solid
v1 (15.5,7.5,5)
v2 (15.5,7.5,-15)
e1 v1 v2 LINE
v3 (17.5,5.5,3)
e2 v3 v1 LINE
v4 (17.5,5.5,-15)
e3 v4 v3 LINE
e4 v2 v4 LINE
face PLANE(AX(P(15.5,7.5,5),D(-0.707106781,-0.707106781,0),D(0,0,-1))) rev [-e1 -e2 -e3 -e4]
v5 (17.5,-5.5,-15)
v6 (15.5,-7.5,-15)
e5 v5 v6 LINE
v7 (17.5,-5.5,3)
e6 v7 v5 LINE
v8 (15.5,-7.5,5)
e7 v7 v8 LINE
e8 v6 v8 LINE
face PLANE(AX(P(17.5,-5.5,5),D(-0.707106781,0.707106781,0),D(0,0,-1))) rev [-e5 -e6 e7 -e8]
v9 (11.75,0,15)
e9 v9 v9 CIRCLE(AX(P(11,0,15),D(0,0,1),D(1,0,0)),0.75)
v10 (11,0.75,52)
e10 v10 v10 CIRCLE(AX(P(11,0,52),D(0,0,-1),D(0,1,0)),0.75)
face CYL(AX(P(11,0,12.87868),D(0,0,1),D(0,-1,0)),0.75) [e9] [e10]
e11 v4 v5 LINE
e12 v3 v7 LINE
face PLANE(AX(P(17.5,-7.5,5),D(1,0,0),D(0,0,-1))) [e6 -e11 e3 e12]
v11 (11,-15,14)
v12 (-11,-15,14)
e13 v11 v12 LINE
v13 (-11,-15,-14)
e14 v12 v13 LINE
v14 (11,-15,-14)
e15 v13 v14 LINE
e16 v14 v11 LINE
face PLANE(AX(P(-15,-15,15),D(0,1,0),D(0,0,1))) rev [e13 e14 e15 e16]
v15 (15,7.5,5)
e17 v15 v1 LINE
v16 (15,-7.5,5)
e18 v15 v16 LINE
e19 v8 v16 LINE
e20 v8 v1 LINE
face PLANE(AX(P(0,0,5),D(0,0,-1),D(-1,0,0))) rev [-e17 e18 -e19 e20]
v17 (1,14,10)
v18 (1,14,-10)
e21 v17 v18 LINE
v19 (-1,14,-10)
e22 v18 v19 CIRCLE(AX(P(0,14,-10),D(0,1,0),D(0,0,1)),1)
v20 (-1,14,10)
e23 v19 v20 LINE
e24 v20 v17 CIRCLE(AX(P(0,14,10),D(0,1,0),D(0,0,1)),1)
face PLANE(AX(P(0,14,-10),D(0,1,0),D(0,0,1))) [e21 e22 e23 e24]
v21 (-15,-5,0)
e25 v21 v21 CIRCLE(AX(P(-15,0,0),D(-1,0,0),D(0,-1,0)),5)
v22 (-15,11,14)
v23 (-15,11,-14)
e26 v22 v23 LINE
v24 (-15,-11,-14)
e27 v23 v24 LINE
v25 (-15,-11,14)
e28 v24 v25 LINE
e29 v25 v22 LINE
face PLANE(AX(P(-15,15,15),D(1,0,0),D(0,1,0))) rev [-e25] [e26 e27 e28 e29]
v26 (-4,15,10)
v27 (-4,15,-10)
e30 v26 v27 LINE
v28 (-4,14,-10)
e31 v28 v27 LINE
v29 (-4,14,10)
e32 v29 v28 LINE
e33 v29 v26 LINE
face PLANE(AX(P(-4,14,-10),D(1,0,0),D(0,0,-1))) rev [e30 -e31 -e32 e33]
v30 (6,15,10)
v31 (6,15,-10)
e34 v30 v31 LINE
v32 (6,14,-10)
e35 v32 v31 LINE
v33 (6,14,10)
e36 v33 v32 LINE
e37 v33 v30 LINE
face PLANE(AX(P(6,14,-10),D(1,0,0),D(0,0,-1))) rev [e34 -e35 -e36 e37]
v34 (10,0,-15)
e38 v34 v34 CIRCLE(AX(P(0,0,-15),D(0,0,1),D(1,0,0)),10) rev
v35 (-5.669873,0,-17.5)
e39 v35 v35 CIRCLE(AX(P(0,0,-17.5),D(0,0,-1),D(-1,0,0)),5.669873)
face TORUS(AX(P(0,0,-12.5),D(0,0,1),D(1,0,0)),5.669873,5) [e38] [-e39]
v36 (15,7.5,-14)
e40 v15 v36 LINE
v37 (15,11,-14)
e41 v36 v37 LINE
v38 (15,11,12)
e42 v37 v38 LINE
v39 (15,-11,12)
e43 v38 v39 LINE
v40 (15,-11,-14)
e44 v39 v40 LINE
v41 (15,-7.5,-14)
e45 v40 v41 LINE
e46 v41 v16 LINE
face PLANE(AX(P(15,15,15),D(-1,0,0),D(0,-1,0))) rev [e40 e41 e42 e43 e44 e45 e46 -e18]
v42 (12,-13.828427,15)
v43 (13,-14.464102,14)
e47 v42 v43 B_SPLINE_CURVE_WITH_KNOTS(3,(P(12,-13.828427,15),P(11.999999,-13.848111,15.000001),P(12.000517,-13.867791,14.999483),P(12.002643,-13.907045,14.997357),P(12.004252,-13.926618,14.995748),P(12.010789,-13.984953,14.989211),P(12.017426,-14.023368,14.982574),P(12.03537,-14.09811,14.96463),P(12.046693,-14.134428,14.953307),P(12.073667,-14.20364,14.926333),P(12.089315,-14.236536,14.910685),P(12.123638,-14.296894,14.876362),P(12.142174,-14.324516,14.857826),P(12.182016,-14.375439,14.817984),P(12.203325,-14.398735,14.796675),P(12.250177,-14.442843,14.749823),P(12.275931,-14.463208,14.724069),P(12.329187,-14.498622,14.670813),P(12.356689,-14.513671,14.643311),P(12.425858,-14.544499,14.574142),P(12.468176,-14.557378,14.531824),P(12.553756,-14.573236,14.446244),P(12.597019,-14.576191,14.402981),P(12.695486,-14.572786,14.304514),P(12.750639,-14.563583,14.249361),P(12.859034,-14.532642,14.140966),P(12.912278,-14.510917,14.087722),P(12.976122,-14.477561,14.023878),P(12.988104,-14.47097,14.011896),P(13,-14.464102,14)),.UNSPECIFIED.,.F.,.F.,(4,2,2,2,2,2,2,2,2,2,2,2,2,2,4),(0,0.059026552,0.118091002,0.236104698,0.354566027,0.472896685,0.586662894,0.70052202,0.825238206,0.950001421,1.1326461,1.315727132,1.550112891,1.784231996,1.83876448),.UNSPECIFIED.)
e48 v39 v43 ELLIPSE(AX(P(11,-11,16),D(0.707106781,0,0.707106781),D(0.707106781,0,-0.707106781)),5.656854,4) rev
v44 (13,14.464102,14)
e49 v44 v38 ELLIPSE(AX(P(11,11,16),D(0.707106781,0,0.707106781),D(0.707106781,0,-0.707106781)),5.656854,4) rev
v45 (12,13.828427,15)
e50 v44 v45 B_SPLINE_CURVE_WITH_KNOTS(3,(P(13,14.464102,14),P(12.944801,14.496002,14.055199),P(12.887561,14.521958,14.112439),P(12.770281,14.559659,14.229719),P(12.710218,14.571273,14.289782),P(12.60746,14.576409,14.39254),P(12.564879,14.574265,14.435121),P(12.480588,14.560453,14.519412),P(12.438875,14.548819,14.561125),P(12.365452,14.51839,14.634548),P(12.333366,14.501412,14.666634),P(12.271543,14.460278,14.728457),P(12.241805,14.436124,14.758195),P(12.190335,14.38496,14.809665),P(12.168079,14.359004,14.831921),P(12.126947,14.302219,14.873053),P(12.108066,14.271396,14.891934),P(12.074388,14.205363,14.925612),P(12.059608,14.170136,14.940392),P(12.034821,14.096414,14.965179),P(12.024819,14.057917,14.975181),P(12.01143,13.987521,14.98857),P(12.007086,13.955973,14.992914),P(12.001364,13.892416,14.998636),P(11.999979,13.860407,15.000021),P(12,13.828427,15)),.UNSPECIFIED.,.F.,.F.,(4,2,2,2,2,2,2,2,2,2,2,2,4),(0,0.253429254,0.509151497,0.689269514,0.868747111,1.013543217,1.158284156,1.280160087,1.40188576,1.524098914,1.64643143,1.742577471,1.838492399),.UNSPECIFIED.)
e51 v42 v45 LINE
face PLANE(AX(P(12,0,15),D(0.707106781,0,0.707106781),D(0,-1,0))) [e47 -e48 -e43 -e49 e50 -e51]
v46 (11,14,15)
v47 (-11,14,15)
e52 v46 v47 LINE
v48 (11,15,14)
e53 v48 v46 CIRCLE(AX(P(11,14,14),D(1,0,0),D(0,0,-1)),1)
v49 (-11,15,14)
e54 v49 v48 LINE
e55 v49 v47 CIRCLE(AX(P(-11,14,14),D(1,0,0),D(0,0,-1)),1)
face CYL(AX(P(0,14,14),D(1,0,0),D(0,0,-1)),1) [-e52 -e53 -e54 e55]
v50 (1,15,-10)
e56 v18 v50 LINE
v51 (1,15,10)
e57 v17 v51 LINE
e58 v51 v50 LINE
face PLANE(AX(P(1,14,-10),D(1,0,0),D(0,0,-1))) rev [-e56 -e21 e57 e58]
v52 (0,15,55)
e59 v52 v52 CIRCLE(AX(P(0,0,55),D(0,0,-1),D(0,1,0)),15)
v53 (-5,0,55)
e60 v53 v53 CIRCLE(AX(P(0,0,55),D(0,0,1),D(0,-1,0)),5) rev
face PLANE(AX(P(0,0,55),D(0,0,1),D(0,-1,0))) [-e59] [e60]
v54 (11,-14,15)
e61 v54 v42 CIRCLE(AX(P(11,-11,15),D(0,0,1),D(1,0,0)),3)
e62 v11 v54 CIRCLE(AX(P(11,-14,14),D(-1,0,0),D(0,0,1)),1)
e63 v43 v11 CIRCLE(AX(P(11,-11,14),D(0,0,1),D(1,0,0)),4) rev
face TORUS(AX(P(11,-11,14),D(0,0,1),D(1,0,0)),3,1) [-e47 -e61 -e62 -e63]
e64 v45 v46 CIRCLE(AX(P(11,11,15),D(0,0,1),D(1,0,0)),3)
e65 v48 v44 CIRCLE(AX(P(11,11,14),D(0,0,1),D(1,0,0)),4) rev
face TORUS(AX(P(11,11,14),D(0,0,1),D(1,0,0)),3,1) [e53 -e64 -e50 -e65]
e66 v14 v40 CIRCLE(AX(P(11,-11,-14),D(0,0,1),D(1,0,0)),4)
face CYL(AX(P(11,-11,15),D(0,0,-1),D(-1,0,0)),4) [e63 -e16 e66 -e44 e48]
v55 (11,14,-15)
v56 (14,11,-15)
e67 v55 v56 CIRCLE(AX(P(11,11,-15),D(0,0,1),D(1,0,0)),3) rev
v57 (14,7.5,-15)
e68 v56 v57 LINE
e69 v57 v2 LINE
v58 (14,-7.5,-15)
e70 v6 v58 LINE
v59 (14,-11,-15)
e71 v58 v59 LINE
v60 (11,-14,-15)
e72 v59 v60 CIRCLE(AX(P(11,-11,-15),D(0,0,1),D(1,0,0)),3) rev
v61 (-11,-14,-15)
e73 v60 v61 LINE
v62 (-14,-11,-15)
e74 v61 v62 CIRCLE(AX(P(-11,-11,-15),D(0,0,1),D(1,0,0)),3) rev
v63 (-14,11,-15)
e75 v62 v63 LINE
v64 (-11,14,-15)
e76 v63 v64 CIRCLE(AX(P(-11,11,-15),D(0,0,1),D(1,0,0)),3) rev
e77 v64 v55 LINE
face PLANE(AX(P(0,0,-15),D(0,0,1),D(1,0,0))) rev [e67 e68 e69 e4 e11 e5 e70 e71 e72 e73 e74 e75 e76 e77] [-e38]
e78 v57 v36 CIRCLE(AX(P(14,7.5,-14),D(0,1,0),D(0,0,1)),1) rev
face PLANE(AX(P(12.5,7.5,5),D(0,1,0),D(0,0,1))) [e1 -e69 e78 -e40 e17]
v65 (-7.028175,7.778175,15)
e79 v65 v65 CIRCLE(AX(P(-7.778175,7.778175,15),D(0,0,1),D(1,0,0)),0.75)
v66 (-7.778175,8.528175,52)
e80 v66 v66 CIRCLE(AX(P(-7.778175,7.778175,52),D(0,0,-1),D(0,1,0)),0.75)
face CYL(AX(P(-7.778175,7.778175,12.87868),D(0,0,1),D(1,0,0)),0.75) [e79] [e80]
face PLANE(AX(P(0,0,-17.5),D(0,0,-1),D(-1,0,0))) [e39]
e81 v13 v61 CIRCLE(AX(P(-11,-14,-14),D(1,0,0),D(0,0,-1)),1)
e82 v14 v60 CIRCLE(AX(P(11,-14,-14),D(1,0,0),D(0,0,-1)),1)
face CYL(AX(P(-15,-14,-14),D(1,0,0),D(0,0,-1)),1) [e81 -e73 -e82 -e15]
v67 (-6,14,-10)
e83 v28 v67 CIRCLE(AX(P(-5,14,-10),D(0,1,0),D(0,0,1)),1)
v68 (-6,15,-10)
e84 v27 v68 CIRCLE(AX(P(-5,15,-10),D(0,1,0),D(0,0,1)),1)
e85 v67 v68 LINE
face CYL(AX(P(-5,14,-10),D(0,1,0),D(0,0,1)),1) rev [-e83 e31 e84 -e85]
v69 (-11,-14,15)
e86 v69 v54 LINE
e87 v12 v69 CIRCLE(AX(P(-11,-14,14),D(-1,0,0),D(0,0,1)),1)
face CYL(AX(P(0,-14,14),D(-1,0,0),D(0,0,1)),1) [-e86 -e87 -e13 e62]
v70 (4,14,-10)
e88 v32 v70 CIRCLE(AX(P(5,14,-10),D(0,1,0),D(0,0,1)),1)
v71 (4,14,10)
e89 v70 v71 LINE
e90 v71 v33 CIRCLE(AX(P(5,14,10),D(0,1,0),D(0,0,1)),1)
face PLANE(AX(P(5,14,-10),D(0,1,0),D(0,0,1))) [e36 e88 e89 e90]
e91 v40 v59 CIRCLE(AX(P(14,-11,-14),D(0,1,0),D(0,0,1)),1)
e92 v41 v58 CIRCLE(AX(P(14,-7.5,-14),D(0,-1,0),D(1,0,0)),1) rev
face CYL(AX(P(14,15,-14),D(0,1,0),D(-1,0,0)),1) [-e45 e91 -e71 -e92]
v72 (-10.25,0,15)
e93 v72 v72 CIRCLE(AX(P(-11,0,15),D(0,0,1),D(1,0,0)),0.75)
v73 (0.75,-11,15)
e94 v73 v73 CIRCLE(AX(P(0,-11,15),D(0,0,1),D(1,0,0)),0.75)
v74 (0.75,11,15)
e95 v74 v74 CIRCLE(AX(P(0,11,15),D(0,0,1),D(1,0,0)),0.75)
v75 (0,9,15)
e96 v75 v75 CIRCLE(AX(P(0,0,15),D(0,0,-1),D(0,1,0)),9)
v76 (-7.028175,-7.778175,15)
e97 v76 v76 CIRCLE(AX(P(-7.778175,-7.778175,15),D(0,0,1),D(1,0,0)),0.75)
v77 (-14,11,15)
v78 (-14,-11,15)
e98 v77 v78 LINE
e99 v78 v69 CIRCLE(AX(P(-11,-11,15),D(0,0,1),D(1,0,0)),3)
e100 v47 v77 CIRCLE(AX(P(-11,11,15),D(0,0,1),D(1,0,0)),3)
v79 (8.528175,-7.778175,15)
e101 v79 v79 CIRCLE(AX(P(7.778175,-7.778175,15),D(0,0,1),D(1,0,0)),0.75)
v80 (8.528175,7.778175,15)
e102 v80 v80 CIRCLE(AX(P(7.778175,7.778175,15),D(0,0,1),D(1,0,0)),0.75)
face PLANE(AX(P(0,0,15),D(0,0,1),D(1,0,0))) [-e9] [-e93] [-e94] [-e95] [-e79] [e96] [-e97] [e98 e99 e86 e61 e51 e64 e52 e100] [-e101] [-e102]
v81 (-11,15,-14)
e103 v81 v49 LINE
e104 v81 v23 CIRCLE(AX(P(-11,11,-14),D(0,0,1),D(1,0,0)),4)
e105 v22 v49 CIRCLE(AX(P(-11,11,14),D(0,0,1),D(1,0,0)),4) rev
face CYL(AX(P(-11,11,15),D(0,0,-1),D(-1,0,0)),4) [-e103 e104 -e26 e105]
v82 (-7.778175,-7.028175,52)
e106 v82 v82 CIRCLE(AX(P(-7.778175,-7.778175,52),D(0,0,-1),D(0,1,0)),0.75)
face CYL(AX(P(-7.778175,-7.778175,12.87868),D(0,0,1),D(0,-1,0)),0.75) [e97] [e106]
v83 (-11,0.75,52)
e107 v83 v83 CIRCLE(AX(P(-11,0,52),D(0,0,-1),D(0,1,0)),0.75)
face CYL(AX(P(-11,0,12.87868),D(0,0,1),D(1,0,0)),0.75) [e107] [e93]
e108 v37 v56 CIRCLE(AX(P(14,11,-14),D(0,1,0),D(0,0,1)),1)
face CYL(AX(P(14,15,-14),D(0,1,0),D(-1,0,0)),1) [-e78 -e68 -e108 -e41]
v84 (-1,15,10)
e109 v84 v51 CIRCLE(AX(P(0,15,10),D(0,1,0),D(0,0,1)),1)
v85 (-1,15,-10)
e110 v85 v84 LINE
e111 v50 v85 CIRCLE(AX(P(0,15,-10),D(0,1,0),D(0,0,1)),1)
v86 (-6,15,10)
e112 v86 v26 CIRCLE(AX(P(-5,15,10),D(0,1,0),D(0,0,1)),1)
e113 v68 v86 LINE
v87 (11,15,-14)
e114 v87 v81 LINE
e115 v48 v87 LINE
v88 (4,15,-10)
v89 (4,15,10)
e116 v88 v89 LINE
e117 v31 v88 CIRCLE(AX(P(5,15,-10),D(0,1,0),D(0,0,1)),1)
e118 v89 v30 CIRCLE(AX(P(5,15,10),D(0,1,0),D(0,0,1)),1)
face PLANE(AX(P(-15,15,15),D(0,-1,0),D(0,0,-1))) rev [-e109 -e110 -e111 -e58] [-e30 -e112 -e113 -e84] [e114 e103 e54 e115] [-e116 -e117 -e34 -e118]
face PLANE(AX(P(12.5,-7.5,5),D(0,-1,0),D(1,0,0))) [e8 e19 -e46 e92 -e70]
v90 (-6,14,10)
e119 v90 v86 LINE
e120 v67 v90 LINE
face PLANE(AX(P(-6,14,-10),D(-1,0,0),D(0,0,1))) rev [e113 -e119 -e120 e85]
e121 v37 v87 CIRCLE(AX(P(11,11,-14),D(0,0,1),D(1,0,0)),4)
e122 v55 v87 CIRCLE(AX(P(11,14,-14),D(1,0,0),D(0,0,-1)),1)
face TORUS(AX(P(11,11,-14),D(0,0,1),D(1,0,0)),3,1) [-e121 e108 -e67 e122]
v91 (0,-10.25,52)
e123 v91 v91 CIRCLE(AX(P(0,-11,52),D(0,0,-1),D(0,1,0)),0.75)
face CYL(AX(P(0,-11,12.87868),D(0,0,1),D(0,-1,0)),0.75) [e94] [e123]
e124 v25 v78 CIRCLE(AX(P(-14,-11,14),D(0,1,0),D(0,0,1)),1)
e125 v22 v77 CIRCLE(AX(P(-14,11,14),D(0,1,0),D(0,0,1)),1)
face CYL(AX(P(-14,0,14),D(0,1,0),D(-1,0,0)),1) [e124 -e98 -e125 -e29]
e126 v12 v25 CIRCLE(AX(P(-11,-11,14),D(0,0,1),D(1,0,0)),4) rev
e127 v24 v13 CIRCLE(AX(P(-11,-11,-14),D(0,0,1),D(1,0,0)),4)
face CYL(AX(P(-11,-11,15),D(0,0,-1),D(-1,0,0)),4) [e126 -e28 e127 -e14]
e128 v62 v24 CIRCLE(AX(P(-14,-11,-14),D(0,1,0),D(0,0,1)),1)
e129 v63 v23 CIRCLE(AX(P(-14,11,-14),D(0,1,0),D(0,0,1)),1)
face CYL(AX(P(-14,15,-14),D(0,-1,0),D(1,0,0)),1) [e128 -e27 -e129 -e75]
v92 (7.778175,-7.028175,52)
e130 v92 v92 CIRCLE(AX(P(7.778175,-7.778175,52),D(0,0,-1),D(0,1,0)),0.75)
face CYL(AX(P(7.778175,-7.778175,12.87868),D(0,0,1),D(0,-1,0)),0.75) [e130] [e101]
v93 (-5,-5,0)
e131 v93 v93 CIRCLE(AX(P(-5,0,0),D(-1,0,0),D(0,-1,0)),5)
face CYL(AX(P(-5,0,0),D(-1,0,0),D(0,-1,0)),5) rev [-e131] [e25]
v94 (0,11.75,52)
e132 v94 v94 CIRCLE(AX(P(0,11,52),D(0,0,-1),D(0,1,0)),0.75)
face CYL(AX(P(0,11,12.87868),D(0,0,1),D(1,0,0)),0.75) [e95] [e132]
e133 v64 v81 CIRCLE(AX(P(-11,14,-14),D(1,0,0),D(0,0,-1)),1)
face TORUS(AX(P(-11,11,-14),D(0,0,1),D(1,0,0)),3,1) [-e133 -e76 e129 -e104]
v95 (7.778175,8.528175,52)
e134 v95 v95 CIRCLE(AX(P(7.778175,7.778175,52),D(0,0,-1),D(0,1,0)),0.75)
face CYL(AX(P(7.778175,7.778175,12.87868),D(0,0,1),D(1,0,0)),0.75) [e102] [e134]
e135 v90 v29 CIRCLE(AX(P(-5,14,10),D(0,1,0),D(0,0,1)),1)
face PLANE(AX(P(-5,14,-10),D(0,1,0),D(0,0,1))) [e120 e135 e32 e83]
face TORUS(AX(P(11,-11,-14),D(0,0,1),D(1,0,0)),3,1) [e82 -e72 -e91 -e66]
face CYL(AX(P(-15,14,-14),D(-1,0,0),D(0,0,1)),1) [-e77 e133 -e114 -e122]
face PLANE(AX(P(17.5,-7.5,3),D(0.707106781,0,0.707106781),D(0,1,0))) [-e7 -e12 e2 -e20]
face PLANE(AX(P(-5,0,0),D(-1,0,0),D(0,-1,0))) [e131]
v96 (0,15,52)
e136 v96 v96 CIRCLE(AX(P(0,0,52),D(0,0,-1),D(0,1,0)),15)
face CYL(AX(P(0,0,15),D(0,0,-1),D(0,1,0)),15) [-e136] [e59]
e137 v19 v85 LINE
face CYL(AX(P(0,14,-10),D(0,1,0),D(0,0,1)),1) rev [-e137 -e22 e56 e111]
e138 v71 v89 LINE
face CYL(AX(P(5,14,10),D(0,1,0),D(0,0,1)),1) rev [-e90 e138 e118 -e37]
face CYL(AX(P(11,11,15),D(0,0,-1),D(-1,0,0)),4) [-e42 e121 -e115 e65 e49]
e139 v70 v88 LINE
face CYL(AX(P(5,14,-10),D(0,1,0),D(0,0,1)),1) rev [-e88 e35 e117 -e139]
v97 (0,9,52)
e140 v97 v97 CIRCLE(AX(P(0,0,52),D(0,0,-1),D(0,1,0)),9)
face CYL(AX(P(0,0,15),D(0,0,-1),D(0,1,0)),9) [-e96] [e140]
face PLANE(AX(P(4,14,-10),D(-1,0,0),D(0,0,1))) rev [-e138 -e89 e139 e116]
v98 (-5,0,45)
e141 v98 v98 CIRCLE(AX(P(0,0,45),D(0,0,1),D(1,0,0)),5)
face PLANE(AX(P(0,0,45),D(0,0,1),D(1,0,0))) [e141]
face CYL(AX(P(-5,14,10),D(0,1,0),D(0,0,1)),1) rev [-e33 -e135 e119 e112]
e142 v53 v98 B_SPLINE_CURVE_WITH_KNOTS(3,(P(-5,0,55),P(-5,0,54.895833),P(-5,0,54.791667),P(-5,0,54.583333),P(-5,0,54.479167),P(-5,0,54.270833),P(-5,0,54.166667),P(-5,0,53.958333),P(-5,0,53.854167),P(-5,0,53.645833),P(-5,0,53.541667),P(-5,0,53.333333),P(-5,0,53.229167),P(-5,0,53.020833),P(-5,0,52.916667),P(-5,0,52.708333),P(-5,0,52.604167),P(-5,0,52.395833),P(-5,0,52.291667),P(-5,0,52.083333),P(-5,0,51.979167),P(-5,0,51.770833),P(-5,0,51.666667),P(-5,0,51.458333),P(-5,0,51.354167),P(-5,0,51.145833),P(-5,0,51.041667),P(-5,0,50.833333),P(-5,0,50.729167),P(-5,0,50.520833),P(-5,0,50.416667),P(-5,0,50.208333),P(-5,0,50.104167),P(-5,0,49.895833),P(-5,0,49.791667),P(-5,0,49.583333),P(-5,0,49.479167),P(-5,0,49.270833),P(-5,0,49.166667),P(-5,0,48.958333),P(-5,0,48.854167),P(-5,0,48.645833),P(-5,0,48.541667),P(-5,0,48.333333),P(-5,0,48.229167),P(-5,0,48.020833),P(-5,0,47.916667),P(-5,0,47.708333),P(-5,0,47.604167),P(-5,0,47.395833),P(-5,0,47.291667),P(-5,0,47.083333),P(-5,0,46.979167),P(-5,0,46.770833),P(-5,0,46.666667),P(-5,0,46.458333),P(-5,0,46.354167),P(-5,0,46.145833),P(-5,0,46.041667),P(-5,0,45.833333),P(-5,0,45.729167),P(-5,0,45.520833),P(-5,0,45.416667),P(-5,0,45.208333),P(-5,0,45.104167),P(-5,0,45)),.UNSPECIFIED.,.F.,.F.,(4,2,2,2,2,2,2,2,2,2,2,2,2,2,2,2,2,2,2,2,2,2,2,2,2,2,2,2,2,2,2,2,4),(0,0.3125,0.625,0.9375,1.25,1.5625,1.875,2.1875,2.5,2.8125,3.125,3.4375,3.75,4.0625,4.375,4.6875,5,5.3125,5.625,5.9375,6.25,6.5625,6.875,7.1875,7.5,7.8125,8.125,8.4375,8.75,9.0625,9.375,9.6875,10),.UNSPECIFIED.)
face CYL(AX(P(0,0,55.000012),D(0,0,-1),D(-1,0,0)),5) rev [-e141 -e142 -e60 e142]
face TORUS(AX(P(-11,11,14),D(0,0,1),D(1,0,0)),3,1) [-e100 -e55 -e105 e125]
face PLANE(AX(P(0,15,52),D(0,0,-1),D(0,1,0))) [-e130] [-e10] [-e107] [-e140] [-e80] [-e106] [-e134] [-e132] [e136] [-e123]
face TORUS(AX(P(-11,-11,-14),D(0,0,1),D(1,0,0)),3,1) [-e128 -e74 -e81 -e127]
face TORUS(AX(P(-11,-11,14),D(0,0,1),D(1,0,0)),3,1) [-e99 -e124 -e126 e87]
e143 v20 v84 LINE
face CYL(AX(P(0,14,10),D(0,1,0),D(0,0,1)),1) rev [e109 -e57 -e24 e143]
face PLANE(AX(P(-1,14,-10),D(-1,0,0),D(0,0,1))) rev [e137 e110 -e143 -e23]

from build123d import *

# Parameters (mm, degrees)
SKETCH1_W               = 30
SKETCH1_H               = 30
BOSS_EXTRUDE1_DEPTH     = 15
FILLET1_R               = 4
CHAMFER2_SIZE           = 3
FILLET2_R               = 1
SKETCH3_R               = 10
BOSS_EXTRUDE2_DEPTH     = 2.5
FILLET3_R               = 5
SKETCH5_W               = 5
SKETCH5_H               = 15
BOSS_EXTRUDE3_DEPTH     = 20
CHAMFER3_SIZE           = 2
CUT_EXTRUDE1_DEPTH      = 77.075620293
CUT_EXTRUDE1_DEPTH_BACK = 10
SKETCH6_R               = 5
SKETCH7_R               = 0.75
BOSS_EXTRUDE4_DEPTH     = 40
CIRPATTERN1_COUNT       = 8
SKETCH8_R               = 5
CUT_EXTRUDE2_DEPTH      = 10
CUT_EXTRUDE3_DEPTH      = 1
LPATTERN1_COUNT         = 2
LPATTERN1_PITCH         = 5
LPATTERN1_COL_COUNT     = 2
LPATTERN1_COL_PITCH     = 5


with BuildPart() as part:
    # Sketch1 → Boss-Extrude1 (new, symmetric)
    with BuildSketch(Plane.XY):
        Rectangle(SKETCH1_W, SKETCH1_H)
    extrude(amount=BOSS_EXTRUDE1_DEPTH, both=True)

    # Sketch2 → Revolve1 (revolve)
    with BuildSketch(Plane(origin=(0, 0, 0), x_dir=(0, 0, -1), z_dir=(1, 0, 0))):
        Polygon((-55, 0), (-55, 15), (-52, 15), (-52, 9), (-15, 9), (-15, 0), align=None)
    revolve(axis=Axis((0, 0, 15), (0, 0, 1)))

    # Fillet1
    fillet1_edges = [part.edges().sort_by_distance(p)[0] for p in [
        (15, -15, 0),
        (-15, -15, 0),
        (-15, 15, 0),
        (15, 15, 0),
    ]]
    fillet(fillet1_edges, radius=FILLET1_R)

    # Chamfer2
    # the kernel refuses this chamfer: 3 mm, written as the material it takes off along each edge
    with BuildSketch(Plane(origin=(15, 18.715048964, 15), x_dir=(-0.9996219169112969, 0, 0.02749587661058621), z_dir=(0, -1, 0))) as chamfer2_piece_1:
        Polygon((CHAMFER2_SIZE * 0.999621916911, CHAMFER2_SIZE * 0.0274958766106), (-CHAMFER2_SIZE * 0.0274958766106, CHAMFER2_SIZE * 0.999621916911), (0, 0), align=None)
    extrude(amount=37.430097928, mode=Mode.SUBTRACT)

    # Fillet2
    fillet2_edges = [part.edges().sort_by_distance(p)[0] for p in [
        (13.828427125, 13.828427125, -15),
        (15, 0, -15),
        (13.828427125, -13.828427125, -15),
        (0, -15, -15),
        (-13.828427125, -13.828427125, -15),
        (-15, 0, -15),
        (-13.828427125, 13.828427125, -15),
        (11.50401717, 14.968118785, 15),
        (11.50401717, -14.968118785, 15),
        (0, -15, 15),
        (-13.828427125, -13.828427125, 15),
        (-15, 0, 15),
        (-13.828427125, 13.828427125, 15),
        (0, 15, -15),
        (0, 15, 15),
    ]]
    fillet(fillet2_edges, radius=FILLET2_R)

    # Sketch3 → Boss-Extrude2 (add, symmetric)
    with BuildSketch(Plane(origin=(0, 0, -15), x_dir=(-1, 0, 0), z_dir=(0, 0, -1))):
        with Locations(Location((0, 0, 0), (0, 0, 180))):
            Circle(SKETCH3_R)
    extrude(amount=BOSS_EXTRUDE2_DEPTH, both=True)

    # Fillet3
    # the kernel refuses this fillet: 5 mm, written as the material it takes off along each edge
    with BuildSketch(Plane(origin=(0, 0, -17.5), x_dir=(1, 0, 0), z_dir=(0, 1, 0))) as fillet3_piece_1:
        with BuildLine():
            CenterArc((5.669872981, -5), FILLET3_R, 30, 60)
            Line((5.669872981, 0), (5.669872981, 0.1))
            Line((5.669872981, 0.1), (10, 0.1))
            Line((10, 0.1), (10.1, 0))
            ThreePointArc((10.1, 0), (10.1, -1.25), (10.08660254, -2.45))
            Line((10.08660254, -2.45), (10, -2.5))
        make_face()
    revolve(axis=Axis((0, 0, -17.5), (0, 0, -1)), mode=Mode.SUBTRACT)

    # Sketch5 → Boss-Extrude3 (add)
    with BuildSketch(Plane(origin=(0, 0, -15), x_dir=(-1, 0, 0), z_dir=(0, 0, -1))):
        with Locations((-15, 0)):
            Rectangle(SKETCH5_W, SKETCH5_H)
    extrude(amount=-BOSS_EXTRUDE3_DEPTH)

    # Chamfer3
    chamfer3_edges = [part.edges().sort_by_distance(p)[0] for p in [
        (17.5, 7.5, -5),
        (17.5, 0, 5),
        (17.5, -7.5, -5),
    ]]
    chamfer(chamfer3_edges, length=CHAMFER3_SIZE)

    # Sketch6 → Cut-Extrude1 (cut, two sides: drawn at the far end of the back side and taken through both)
    with BuildSketch(Plane.XY.offset(55).offset(-CUT_EXTRUDE1_DEPTH_BACK)):
        with Locations(Location((0, 0, 0), (0, 0, 180))):
            Circle(SKETCH6_R)
    extrude(amount=CUT_EXTRUDE1_DEPTH + CUT_EXTRUDE1_DEPTH_BACK, mode=Mode.SUBTRACT)

    # Sketch7 → Boss-Extrude4 (add)
    with BuildSketch(Plane.XY.offset(55)):
        with Locations((0, 11)):
            Circle(SKETCH7_R)
    boss_extrude4 = extrude(amount=-BOSS_EXTRUDE4_DEPTH)

    # CirPattern1: Boss-Extrude4 ×8 about axis
    cirpattern1_axis = Axis((0, 0, 0), (0, 0, 1))
    for i in range(1, CIRPATTERN1_COUNT):
        add(boss_extrude4.rotate(cirpattern1_axis, i * 360 / CIRPATTERN1_COUNT))

    # Sketch8 → Cut-Extrude2 (cut)
    with BuildSketch(Plane.ZY.offset(15)):
        with Locations(Location((0, 0, 0), (0, 0, 270))):
            Circle(SKETCH8_R)
    extrude(amount=-CUT_EXTRUDE2_DEPTH, mode=Mode.SUBTRACT)

    # Sketch9 → Cut-Extrude3 (cut)
    with BuildSketch(Plane(origin=(0, 15, 0), x_dir=(1, 0, 0), z_dir=(0, 1, 0))):
        with BuildLine():
            Line((1, 10), (1, -10))
            ThreePointArc((1, -10), (0, -11), (-1, -10))
            Line((-1, -10), (-1, 10))
            ThreePointArc((-1, 10), (0, 11), (1, 10))
        make_face()
    cut_extrude3 = extrude(amount=-CUT_EXTRUDE3_DEPTH, mode=Mode.SUBTRACT)

    # LPattern1: Cut-Extrude3 ×2
    with Locations(*[(i * LPATTERN1_PITCH, 0, 0) for i in range(1, LPATTERN1_COUNT)]):
        add(cut_extrude3, mode=Mode.SUBTRACT)

    # LPattern1 col: Cut-Extrude3 ×2
    with Locations(*[(-i * LPATTERN1_COL_PITCH, 0, 0) for i in range(1, LPATTERN1_COL_COUNT)]):
        add(cut_extrude3, mode=Mode.SUBTRACT)


solid = part.part
